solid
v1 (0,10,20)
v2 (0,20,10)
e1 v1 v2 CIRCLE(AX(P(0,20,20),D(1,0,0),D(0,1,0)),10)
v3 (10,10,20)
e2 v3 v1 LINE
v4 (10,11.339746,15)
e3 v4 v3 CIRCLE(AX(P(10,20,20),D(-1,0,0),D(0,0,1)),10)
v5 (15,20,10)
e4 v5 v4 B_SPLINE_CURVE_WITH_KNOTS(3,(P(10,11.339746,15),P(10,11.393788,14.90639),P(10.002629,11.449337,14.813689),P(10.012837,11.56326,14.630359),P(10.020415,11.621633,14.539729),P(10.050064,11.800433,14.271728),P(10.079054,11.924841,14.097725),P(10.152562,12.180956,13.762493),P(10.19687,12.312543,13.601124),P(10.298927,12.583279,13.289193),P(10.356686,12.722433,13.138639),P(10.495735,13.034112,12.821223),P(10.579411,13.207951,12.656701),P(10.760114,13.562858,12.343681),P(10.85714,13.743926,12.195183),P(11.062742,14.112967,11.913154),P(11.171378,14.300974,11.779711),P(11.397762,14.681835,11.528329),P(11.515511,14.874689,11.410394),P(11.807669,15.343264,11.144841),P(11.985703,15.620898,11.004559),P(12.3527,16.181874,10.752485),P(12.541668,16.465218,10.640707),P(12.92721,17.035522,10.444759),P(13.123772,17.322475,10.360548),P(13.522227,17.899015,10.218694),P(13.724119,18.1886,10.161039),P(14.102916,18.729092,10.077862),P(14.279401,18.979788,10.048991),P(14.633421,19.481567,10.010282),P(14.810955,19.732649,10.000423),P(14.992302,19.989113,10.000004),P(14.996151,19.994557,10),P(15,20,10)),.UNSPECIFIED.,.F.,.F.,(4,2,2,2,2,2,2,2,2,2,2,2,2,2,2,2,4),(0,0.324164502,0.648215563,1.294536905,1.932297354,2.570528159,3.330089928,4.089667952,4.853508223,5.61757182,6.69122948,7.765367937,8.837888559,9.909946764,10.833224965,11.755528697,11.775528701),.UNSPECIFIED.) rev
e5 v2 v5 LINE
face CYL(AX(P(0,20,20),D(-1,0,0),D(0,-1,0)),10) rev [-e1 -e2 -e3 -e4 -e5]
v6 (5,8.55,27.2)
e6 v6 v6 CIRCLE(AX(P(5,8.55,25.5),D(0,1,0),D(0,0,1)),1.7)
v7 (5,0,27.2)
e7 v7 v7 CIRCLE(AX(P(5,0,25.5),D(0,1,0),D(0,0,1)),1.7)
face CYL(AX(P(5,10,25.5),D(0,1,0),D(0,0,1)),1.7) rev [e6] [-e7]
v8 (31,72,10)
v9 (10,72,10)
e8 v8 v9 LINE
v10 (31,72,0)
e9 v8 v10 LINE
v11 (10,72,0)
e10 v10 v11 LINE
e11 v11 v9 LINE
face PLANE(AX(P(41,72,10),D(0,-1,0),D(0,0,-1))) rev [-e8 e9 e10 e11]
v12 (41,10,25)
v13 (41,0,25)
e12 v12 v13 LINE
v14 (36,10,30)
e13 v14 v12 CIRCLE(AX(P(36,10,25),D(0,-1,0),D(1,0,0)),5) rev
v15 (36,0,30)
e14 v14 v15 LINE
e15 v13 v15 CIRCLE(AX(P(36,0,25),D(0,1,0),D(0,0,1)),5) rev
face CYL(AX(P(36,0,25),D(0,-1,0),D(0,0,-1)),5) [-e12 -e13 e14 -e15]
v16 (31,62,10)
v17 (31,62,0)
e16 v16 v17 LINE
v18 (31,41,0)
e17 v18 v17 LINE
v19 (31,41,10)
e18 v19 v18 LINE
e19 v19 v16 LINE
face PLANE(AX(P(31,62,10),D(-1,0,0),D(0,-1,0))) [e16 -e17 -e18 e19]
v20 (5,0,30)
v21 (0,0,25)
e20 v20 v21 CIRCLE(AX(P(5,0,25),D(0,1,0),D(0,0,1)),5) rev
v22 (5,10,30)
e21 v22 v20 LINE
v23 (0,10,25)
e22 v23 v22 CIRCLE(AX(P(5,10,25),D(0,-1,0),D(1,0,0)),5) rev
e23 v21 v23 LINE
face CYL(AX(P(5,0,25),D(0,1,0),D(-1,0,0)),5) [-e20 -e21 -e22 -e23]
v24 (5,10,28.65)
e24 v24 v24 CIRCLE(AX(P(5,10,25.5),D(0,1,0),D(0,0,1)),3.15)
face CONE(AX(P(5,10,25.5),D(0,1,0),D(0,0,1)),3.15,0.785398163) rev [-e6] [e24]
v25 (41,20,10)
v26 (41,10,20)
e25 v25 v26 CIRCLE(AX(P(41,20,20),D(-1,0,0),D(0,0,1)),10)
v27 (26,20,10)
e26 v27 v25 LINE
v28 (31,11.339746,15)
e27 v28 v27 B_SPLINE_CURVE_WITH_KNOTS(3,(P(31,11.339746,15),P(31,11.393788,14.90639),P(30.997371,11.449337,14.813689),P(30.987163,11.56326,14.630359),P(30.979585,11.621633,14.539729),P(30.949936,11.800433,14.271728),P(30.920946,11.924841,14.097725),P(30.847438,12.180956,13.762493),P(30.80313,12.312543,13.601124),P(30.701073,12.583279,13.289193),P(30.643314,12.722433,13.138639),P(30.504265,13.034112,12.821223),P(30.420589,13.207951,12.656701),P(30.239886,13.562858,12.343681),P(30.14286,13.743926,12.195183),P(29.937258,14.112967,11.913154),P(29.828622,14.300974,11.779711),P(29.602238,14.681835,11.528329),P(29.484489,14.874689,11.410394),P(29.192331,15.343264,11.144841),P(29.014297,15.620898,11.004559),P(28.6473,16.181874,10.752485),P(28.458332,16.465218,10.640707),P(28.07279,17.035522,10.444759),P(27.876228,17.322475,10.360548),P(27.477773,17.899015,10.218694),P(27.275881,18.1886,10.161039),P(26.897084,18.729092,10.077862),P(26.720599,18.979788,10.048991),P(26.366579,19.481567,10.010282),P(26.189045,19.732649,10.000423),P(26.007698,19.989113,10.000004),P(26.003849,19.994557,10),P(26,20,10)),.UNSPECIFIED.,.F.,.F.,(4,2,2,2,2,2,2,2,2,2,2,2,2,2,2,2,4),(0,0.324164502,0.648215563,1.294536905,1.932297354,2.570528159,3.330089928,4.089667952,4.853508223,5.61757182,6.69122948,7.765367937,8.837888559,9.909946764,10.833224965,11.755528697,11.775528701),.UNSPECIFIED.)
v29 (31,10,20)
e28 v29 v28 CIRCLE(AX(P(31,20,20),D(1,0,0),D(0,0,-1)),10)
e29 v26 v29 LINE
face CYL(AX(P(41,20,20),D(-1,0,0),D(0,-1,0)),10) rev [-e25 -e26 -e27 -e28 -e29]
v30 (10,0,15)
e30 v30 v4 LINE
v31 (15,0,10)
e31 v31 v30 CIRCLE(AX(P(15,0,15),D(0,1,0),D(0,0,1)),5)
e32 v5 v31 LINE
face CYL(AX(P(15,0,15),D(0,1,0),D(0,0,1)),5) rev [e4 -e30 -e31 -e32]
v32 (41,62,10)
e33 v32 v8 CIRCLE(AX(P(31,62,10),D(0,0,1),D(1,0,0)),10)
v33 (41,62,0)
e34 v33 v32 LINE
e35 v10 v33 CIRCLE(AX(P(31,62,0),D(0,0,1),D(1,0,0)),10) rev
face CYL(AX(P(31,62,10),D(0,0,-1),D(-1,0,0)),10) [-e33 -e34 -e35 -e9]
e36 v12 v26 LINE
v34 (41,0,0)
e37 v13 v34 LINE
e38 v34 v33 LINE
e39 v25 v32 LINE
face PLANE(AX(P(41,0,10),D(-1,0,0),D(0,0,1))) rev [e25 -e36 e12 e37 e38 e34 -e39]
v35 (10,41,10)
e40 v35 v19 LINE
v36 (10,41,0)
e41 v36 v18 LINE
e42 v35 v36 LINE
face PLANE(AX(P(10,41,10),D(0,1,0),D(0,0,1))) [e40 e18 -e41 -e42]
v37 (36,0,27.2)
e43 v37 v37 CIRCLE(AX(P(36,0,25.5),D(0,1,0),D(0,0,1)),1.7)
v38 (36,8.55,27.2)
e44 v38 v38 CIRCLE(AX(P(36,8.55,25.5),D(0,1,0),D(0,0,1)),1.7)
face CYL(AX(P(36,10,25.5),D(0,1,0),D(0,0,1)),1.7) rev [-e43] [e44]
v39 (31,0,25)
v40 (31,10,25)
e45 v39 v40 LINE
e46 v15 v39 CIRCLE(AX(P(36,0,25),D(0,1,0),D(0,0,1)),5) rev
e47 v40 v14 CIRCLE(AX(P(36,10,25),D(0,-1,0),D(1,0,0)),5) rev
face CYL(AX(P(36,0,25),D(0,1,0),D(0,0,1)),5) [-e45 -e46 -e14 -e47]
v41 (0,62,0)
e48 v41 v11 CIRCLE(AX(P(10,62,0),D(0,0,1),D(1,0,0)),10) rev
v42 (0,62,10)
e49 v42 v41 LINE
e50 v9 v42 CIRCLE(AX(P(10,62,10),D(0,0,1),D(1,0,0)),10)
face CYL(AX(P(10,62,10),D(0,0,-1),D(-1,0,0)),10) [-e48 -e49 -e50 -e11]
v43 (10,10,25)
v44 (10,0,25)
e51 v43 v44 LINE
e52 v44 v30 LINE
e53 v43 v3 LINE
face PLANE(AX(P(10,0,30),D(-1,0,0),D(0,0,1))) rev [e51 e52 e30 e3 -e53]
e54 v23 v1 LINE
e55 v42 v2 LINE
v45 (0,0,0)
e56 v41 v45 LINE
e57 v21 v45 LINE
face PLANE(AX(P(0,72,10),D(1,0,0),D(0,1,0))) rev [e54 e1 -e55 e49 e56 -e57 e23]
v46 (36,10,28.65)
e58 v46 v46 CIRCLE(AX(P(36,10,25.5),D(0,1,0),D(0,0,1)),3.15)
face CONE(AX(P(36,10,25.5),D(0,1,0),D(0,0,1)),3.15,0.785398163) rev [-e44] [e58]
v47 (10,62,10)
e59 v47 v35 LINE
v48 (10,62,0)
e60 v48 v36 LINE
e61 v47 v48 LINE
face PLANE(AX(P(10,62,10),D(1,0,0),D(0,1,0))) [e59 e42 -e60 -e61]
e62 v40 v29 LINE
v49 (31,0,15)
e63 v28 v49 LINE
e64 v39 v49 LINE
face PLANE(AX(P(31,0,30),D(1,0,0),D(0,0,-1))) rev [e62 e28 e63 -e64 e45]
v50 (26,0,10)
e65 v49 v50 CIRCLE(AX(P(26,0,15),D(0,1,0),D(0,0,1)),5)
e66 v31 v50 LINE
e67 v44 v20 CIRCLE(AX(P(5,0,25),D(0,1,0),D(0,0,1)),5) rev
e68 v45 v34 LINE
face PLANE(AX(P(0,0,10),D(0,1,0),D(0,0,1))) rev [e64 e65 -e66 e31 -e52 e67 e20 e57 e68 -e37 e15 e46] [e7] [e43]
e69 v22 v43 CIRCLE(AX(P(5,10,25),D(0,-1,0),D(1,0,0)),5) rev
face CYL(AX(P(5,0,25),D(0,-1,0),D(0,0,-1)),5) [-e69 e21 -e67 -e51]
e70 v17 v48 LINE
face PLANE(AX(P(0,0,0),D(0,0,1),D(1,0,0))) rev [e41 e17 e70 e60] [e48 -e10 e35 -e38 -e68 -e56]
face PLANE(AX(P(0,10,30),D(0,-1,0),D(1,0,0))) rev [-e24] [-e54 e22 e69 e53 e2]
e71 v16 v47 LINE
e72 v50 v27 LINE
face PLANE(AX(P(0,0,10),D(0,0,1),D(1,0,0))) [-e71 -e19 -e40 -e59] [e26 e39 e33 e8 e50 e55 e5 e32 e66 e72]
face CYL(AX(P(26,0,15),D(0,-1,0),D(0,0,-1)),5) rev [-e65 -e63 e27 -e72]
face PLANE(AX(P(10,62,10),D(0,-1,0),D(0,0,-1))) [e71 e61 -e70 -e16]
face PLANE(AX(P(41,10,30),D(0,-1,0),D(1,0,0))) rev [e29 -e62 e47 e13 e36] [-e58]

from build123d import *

# Parameters (mm, degrees)
ESQUISSE1_W                                    = 41
ESQUISSE1_H                                    = 72
ESQUISSE1_W_2                                  = 21
ESQUISSE1_H_2                                  = 21
BOSS_EXTRU_1_DEPTH                             = 10
ESQUISSE3_W                                    = 10
ESQUISSE3_H                                    = 10
BOSS_EXTRU_2_DEPTH                             = 20
FRAISAGE_POUR_VIS_T_TE_FRAIS_E_M31_D           = 3.4
FRAISAGE_POUR_VIS_T_TE_FRAIS_E_M31_CSINK_D     = 6.3
FRAISAGE_POUR_VIS_T_TE_FRAIS_E_M31_CSINK_ANGLE = 90
CONG_2_R                                       = 10
CONG_3_R                                       = 5
CONG_4_R                                       = 10


with BuildPart() as part:
    # Esquisse1 → Boss.-Extru.1 (new body)
    with BuildSketch(Plane.XY):
        with Locations((20.5, 36)):
            Rectangle(ESQUISSE1_W, ESQUISSE1_H)
        with Locations((20.5, 51.5)):
            Rectangle(ESQUISSE1_W_2, ESQUISSE1_H_2, mode=Mode.SUBTRACT)
    extrude(amount=BOSS_EXTRU_1_DEPTH)

    # Esquisse3 → Boss.-Extru.2 (add)
    with BuildSketch(Plane.XY.offset(10)):
        with Locations((36, 5)):
            Rectangle(ESQUISSE3_W, ESQUISSE3_H)
        with Locations((5, 5)):
            Rectangle(ESQUISSE3_W, ESQUISSE3_H)
    extrude(amount=BOSS_EXTRU_2_DEPTH)

    # Fraisage pour vis à tête fraisée M31 (through all)
    with Locations(Plane(origin=(0, 10, 0), x_dir=(1, 0, 0), z_dir=(0, 1, 0))):
        with Locations((5, -25.5), (36, -25.5)):
            CounterSinkHole(FRAISAGE_POUR_VIS_T_TE_FRAIS_E_M31_D / 2, FRAISAGE_POUR_VIS_T_TE_FRAIS_E_M31_CSINK_D / 2, counter_sink_angle=FRAISAGE_POUR_VIS_T_TE_FRAIS_E_M31_CSINK_ANGLE)

    # Congé2
    cong_2_edges = [part.edges().sort_by_distance(p)[0] for p in [
        (0, 72, 5),
        (41, 72, 5),
    ]]
    fillet(cong_2_edges, radius=CONG_2_R)

    # Congé3
    cong_3_edges = [part.edges().sort_by_distance(p)[0] for p in [
        (10, 5, 10),
        (31, 5, 10),
        (41, 5, 30),
        (31, 5, 30),
        (10, 5, 30),
        (0, 5, 30),
    ]]
    fillet(cong_3_edges, radius=CONG_3_R - 0.0001)  # a hair under: the kernel refuses the full size

    # Congé4
    cong_4_edges = [part.edges().sort_by_distance(p)[0] for p in [
        (33.50005, 10, 10),
        (7.49995, 10, 10),
    ]]
    fillet(cong_4_edges, radius=CONG_4_R)


solid = part.part
